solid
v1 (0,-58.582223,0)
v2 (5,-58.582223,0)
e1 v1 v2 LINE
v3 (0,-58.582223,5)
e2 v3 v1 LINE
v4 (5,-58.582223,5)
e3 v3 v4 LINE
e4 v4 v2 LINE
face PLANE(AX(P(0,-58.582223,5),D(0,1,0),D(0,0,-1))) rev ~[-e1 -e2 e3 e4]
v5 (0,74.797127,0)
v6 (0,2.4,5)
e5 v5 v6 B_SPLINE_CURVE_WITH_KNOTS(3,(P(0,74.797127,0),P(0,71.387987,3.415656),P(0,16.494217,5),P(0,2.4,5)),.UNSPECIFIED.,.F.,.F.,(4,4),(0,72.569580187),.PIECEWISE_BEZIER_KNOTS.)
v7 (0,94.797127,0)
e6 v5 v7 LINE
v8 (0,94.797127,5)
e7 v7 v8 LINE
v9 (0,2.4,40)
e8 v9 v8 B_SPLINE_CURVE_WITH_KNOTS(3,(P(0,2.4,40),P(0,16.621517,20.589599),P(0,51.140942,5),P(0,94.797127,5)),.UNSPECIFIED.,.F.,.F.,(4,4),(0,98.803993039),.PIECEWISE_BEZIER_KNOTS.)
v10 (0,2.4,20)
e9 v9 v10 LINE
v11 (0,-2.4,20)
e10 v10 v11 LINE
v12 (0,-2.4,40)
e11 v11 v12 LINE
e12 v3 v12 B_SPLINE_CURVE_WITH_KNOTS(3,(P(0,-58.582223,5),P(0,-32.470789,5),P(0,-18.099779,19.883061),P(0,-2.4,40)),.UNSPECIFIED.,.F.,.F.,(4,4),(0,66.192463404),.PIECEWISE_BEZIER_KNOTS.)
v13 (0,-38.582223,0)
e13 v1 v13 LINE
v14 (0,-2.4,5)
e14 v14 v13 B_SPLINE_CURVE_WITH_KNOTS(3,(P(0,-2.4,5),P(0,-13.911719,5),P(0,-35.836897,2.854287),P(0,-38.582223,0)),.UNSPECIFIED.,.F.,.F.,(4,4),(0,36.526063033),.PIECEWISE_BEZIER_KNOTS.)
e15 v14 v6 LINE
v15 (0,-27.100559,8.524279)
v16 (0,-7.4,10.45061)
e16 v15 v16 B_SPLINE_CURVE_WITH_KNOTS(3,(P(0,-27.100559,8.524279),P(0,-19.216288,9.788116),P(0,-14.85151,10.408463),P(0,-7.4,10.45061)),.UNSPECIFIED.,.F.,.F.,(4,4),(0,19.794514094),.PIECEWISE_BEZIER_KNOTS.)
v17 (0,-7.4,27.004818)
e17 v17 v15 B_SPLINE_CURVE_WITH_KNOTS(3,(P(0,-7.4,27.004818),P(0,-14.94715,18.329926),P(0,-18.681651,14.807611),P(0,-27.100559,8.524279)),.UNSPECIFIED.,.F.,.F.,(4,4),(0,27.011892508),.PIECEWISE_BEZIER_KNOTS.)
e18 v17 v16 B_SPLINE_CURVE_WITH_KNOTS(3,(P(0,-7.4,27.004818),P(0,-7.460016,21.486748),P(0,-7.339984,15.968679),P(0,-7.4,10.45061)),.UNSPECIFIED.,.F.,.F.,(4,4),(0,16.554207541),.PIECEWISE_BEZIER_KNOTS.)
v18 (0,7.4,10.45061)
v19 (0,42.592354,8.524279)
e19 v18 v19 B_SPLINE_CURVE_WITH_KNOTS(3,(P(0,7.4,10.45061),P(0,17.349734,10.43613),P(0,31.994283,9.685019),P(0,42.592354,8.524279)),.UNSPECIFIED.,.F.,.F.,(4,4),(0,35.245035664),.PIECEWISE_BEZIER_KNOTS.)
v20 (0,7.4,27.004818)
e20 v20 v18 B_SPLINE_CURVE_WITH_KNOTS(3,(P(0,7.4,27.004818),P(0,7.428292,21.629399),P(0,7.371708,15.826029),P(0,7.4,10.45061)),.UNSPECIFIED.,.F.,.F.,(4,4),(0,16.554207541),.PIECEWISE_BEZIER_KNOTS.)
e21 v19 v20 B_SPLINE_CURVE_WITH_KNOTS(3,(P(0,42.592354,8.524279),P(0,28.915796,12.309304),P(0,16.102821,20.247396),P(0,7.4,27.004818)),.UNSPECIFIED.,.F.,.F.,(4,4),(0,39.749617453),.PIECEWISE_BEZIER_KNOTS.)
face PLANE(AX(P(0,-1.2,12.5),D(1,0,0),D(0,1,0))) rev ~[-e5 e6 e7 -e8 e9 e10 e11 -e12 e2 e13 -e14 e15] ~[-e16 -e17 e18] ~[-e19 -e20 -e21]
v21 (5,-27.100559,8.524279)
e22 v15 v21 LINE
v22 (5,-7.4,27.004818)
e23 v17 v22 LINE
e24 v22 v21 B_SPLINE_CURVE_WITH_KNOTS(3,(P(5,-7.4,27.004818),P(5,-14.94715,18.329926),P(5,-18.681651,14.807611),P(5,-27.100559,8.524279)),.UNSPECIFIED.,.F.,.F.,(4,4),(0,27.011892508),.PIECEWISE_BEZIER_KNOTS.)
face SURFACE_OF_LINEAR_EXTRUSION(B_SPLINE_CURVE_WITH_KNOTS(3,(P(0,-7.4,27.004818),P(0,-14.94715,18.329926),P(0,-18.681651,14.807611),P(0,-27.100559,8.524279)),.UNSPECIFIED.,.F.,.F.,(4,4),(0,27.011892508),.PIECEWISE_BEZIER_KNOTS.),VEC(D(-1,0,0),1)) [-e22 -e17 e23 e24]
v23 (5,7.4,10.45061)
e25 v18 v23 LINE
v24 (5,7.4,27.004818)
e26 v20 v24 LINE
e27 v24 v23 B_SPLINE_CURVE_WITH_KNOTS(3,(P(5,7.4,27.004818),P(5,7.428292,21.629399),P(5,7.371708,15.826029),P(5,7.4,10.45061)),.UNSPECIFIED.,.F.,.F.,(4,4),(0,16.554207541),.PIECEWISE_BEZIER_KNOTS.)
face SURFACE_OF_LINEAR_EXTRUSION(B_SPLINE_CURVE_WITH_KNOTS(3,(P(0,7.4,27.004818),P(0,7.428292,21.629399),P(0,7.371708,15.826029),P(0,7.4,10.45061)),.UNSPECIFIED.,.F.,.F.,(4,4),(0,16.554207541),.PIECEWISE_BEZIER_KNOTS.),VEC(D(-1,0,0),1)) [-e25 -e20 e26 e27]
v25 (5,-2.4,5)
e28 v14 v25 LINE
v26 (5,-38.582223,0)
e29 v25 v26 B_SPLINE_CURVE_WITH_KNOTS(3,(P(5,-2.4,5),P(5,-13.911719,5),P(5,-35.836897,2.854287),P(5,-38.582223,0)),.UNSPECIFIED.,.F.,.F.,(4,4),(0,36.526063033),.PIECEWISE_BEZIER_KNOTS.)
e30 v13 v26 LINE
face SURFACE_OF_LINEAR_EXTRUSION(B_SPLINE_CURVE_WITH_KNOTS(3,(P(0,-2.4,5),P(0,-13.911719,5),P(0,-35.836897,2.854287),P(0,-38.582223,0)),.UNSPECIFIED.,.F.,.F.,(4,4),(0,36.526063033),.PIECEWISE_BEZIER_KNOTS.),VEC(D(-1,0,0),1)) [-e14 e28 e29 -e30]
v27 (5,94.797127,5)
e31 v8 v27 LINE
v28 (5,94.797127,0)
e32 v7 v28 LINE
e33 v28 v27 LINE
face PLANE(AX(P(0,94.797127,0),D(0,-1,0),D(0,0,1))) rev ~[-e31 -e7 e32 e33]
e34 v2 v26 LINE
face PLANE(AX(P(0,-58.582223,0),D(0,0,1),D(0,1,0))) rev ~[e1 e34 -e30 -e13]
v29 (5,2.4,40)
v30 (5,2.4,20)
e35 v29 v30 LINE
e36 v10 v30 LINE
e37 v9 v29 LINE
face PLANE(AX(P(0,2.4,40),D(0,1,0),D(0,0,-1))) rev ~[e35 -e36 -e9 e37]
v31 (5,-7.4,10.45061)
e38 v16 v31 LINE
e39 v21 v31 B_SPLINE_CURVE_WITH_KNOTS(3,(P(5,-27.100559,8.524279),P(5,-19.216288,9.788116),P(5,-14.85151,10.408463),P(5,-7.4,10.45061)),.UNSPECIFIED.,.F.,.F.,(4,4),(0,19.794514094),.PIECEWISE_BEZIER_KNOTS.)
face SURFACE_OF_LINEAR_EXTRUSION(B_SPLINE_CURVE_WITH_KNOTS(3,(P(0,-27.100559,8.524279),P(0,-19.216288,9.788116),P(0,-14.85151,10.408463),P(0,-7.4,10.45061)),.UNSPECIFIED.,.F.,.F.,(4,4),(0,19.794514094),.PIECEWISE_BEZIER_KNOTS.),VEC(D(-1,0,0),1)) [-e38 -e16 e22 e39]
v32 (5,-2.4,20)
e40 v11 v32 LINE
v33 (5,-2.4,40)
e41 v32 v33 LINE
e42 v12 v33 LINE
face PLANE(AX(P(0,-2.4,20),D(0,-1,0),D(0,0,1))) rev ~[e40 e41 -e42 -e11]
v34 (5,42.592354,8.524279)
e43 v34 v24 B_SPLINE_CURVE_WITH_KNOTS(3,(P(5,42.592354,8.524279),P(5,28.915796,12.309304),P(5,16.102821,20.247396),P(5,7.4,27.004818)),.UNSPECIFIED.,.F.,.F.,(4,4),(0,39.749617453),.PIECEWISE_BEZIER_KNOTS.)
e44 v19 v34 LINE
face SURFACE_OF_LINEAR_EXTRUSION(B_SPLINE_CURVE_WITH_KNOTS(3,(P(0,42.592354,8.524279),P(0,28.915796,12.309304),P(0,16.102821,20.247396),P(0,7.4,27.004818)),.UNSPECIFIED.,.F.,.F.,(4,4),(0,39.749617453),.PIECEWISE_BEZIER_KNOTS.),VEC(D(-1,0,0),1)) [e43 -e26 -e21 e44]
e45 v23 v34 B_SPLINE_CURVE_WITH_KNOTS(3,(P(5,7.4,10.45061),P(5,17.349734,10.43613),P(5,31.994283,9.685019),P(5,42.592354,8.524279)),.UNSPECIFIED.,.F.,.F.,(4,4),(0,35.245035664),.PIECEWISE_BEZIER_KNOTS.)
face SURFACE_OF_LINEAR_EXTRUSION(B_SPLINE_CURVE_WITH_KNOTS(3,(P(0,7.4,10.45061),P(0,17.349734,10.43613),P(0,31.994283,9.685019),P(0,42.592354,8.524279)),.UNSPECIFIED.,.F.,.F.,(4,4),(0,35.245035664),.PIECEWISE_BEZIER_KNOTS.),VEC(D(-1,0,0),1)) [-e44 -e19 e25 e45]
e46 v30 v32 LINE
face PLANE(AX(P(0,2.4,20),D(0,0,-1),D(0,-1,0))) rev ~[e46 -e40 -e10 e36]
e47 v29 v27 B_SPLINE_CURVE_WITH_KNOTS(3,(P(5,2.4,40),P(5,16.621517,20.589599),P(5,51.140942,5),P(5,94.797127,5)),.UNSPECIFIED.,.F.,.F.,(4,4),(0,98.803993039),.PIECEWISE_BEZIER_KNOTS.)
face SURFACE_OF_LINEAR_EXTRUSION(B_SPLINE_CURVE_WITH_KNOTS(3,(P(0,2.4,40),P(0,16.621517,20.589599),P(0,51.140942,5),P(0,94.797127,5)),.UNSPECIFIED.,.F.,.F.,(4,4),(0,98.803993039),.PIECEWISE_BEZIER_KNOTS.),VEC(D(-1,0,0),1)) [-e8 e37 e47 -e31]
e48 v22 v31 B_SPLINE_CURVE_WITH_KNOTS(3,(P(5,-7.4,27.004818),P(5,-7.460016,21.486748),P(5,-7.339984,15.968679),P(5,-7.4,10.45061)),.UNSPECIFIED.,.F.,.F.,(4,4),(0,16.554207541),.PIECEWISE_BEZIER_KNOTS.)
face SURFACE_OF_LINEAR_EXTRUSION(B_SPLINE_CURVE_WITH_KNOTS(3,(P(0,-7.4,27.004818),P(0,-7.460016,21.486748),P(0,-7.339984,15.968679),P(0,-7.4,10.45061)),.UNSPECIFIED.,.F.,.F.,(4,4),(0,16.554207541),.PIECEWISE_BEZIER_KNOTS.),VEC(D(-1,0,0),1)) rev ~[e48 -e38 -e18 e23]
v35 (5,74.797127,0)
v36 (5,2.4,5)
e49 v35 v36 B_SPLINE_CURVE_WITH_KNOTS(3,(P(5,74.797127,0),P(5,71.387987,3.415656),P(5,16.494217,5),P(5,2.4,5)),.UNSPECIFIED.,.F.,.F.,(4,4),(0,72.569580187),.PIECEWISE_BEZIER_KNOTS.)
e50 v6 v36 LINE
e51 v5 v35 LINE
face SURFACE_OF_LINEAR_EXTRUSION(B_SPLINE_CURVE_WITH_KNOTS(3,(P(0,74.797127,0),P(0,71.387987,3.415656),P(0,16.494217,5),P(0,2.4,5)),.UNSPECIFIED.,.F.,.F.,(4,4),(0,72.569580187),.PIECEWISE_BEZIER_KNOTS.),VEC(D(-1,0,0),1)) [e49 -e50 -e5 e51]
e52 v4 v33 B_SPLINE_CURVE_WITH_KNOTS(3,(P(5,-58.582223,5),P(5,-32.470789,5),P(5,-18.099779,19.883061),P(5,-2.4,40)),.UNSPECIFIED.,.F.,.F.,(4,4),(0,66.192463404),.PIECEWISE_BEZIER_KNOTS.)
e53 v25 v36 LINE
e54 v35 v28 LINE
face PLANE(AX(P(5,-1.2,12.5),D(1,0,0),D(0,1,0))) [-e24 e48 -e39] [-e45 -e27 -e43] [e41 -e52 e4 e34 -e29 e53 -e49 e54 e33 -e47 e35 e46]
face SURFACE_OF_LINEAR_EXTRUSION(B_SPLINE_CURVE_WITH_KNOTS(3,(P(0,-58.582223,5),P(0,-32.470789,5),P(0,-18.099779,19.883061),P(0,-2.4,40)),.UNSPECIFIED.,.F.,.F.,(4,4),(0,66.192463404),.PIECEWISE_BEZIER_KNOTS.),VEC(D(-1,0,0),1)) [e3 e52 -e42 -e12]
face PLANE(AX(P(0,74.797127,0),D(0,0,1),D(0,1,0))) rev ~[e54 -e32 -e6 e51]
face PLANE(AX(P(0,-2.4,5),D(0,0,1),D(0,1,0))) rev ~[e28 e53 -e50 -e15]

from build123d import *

# Parameters (mm, degrees)
F0_W     = 2.4
F0_H     = 15
F1_DEPTH = 5


# Not quite as in the source:
# - a feature names something its author has since deleted; it is built from what else it names


with BuildPart() as f1:
    # F0 (on Right) → F1 (new body)
    with BuildSketch(Plane.YZ):
        with Locations((-1.2, 12.5)):
            Rectangle(F0_W, F0_H)
        with Locations((1.2, 12.5)):
            Rectangle(F0_W, F0_H)
        with BuildLine():
            Line((2.4, 20), (2.4, 5))
            add(Edge.make_bspline(
                [(74.7971267972, 0), (71.3879865607, 3.4156564958), (16.494217181, 5), (2.4, 5)],
                knots=[0, 0, 0, 0, 72.5695801868, 72.5695801868, 72.5695801868, 72.5695801868], degree=3))
            Line((74.7971267972, 0), (94.7971267972, 0))
            Line((94.7971267972, 0), (94.7971267972, 5))
            add(Edge.make_bspline(
                [(2.4, 40), (16.6215170175, 20.5895993859), (51.1409416795, 5), (94.7971267972, 5)],
                knots=[0, 0, 0, 0, 98.8039930387, 98.8039930387, 98.8039930387, 98.8039930387], degree=3))
            Line((2.4, 40), (2.4, 20))
        make_face()
        with BuildLine():
            add(Edge.make_bspline(
                [(7.4, 27.0048175007), (7.4282917172, 21.6293986887), (7.3717082828, 15.8260287717), (7.4, 10.4506099597)],
                knots=[0, 0, 0, 0, 16.554207541, 16.554207541, 16.554207541, 16.554207541], degree=3))
            add(Edge.make_bspline(
                [(42.5923541188, 8.5242791101), (28.9157964289, 12.3093035072), (16.1028206348, 20.2473960817), (7.4, 27.0048175007)],
                knots=[0, 0, 0, 0, 39.7496174526, 39.7496174526, 39.7496174526, 39.7496174526], degree=3))
            add(Edge.make_bspline(
                [(7.4, 10.4506099597), (17.3497335032, 10.4361297563), (31.9942831993, 9.6850190312), (42.5923541188, 8.5242791101)],
                knots=[0, 0, 0, 0, 35.2450356641, 35.2450356641, 35.2450356641, 35.2450356641], degree=3))
        make_face(mode=Mode.SUBTRACT)
        with BuildLine():
            add(Edge.make_bspline(
                [(-2.4, 5), (-13.9117193222, 5), (-35.8368966605, 2.8542873915), (-38.5822232689, 0)],
                knots=[0, 0, 0, 0, 36.5260630329, 36.5260630329, 36.5260630329, 36.5260630329], degree=3))
            Line((-2.4, 5), (-2.4, 20))
            Line((-2.4, 20), (-2.4, 30.4898899049))
            Line((-2.4, 30.4898899049), (-2.4, 40))
            add(Edge.make_bspline(
                [(-58.5822232689, 5), (-32.4707888067, 5), (-18.0997792631, 19.8830608279), (-2.4, 40)],
                knots=[0, 0, 0, 0, 66.1924634036, 66.1924634036, 66.1924634036, 66.1924634036], degree=3))
            Line((-58.5822232689, 5), (-58.5822232689, 0))
            Line((-58.5822232689, 0), (-38.5822232689, 0))
        make_face()
        with BuildLine():
            add(Edge.make_bspline(
                [(-7.4, 27.0048175007), (-14.9471499026, 18.3299258351), (-18.6816509813, 14.8076107726), (-27.100559324, 8.5242791101)],
                knots=[0, 0, 0, 0, 27.0118925084, 27.0118925084, 27.0118925084, 27.0118925084], degree=3))
            add(Edge.make_bspline(
                [(-7.4, 27.0048175007), (-7.4600156685, 21.4867483204), (-7.3399843315, 15.96867914), (-7.4, 10.4506099597)],
                knots=[0, 0, 0, 0, 16.554207541, 16.554207541, 16.554207541, 16.554207541], degree=3))
            add(Edge.make_bspline(
                [(-27.100559324, 8.5242791101), (-19.2162878811, 9.7881155089), (-14.8515102789, 10.4084629565), (-7.4, 10.4506099597)],
                knots=[0, 0, 0, 0, 19.7945140941, 19.7945140941, 19.7945140941, 19.7945140941], degree=3))
        make_face(mode=Mode.SUBTRACT)
    extrude(amount=F1_DEPTH)


solid = f1.part
